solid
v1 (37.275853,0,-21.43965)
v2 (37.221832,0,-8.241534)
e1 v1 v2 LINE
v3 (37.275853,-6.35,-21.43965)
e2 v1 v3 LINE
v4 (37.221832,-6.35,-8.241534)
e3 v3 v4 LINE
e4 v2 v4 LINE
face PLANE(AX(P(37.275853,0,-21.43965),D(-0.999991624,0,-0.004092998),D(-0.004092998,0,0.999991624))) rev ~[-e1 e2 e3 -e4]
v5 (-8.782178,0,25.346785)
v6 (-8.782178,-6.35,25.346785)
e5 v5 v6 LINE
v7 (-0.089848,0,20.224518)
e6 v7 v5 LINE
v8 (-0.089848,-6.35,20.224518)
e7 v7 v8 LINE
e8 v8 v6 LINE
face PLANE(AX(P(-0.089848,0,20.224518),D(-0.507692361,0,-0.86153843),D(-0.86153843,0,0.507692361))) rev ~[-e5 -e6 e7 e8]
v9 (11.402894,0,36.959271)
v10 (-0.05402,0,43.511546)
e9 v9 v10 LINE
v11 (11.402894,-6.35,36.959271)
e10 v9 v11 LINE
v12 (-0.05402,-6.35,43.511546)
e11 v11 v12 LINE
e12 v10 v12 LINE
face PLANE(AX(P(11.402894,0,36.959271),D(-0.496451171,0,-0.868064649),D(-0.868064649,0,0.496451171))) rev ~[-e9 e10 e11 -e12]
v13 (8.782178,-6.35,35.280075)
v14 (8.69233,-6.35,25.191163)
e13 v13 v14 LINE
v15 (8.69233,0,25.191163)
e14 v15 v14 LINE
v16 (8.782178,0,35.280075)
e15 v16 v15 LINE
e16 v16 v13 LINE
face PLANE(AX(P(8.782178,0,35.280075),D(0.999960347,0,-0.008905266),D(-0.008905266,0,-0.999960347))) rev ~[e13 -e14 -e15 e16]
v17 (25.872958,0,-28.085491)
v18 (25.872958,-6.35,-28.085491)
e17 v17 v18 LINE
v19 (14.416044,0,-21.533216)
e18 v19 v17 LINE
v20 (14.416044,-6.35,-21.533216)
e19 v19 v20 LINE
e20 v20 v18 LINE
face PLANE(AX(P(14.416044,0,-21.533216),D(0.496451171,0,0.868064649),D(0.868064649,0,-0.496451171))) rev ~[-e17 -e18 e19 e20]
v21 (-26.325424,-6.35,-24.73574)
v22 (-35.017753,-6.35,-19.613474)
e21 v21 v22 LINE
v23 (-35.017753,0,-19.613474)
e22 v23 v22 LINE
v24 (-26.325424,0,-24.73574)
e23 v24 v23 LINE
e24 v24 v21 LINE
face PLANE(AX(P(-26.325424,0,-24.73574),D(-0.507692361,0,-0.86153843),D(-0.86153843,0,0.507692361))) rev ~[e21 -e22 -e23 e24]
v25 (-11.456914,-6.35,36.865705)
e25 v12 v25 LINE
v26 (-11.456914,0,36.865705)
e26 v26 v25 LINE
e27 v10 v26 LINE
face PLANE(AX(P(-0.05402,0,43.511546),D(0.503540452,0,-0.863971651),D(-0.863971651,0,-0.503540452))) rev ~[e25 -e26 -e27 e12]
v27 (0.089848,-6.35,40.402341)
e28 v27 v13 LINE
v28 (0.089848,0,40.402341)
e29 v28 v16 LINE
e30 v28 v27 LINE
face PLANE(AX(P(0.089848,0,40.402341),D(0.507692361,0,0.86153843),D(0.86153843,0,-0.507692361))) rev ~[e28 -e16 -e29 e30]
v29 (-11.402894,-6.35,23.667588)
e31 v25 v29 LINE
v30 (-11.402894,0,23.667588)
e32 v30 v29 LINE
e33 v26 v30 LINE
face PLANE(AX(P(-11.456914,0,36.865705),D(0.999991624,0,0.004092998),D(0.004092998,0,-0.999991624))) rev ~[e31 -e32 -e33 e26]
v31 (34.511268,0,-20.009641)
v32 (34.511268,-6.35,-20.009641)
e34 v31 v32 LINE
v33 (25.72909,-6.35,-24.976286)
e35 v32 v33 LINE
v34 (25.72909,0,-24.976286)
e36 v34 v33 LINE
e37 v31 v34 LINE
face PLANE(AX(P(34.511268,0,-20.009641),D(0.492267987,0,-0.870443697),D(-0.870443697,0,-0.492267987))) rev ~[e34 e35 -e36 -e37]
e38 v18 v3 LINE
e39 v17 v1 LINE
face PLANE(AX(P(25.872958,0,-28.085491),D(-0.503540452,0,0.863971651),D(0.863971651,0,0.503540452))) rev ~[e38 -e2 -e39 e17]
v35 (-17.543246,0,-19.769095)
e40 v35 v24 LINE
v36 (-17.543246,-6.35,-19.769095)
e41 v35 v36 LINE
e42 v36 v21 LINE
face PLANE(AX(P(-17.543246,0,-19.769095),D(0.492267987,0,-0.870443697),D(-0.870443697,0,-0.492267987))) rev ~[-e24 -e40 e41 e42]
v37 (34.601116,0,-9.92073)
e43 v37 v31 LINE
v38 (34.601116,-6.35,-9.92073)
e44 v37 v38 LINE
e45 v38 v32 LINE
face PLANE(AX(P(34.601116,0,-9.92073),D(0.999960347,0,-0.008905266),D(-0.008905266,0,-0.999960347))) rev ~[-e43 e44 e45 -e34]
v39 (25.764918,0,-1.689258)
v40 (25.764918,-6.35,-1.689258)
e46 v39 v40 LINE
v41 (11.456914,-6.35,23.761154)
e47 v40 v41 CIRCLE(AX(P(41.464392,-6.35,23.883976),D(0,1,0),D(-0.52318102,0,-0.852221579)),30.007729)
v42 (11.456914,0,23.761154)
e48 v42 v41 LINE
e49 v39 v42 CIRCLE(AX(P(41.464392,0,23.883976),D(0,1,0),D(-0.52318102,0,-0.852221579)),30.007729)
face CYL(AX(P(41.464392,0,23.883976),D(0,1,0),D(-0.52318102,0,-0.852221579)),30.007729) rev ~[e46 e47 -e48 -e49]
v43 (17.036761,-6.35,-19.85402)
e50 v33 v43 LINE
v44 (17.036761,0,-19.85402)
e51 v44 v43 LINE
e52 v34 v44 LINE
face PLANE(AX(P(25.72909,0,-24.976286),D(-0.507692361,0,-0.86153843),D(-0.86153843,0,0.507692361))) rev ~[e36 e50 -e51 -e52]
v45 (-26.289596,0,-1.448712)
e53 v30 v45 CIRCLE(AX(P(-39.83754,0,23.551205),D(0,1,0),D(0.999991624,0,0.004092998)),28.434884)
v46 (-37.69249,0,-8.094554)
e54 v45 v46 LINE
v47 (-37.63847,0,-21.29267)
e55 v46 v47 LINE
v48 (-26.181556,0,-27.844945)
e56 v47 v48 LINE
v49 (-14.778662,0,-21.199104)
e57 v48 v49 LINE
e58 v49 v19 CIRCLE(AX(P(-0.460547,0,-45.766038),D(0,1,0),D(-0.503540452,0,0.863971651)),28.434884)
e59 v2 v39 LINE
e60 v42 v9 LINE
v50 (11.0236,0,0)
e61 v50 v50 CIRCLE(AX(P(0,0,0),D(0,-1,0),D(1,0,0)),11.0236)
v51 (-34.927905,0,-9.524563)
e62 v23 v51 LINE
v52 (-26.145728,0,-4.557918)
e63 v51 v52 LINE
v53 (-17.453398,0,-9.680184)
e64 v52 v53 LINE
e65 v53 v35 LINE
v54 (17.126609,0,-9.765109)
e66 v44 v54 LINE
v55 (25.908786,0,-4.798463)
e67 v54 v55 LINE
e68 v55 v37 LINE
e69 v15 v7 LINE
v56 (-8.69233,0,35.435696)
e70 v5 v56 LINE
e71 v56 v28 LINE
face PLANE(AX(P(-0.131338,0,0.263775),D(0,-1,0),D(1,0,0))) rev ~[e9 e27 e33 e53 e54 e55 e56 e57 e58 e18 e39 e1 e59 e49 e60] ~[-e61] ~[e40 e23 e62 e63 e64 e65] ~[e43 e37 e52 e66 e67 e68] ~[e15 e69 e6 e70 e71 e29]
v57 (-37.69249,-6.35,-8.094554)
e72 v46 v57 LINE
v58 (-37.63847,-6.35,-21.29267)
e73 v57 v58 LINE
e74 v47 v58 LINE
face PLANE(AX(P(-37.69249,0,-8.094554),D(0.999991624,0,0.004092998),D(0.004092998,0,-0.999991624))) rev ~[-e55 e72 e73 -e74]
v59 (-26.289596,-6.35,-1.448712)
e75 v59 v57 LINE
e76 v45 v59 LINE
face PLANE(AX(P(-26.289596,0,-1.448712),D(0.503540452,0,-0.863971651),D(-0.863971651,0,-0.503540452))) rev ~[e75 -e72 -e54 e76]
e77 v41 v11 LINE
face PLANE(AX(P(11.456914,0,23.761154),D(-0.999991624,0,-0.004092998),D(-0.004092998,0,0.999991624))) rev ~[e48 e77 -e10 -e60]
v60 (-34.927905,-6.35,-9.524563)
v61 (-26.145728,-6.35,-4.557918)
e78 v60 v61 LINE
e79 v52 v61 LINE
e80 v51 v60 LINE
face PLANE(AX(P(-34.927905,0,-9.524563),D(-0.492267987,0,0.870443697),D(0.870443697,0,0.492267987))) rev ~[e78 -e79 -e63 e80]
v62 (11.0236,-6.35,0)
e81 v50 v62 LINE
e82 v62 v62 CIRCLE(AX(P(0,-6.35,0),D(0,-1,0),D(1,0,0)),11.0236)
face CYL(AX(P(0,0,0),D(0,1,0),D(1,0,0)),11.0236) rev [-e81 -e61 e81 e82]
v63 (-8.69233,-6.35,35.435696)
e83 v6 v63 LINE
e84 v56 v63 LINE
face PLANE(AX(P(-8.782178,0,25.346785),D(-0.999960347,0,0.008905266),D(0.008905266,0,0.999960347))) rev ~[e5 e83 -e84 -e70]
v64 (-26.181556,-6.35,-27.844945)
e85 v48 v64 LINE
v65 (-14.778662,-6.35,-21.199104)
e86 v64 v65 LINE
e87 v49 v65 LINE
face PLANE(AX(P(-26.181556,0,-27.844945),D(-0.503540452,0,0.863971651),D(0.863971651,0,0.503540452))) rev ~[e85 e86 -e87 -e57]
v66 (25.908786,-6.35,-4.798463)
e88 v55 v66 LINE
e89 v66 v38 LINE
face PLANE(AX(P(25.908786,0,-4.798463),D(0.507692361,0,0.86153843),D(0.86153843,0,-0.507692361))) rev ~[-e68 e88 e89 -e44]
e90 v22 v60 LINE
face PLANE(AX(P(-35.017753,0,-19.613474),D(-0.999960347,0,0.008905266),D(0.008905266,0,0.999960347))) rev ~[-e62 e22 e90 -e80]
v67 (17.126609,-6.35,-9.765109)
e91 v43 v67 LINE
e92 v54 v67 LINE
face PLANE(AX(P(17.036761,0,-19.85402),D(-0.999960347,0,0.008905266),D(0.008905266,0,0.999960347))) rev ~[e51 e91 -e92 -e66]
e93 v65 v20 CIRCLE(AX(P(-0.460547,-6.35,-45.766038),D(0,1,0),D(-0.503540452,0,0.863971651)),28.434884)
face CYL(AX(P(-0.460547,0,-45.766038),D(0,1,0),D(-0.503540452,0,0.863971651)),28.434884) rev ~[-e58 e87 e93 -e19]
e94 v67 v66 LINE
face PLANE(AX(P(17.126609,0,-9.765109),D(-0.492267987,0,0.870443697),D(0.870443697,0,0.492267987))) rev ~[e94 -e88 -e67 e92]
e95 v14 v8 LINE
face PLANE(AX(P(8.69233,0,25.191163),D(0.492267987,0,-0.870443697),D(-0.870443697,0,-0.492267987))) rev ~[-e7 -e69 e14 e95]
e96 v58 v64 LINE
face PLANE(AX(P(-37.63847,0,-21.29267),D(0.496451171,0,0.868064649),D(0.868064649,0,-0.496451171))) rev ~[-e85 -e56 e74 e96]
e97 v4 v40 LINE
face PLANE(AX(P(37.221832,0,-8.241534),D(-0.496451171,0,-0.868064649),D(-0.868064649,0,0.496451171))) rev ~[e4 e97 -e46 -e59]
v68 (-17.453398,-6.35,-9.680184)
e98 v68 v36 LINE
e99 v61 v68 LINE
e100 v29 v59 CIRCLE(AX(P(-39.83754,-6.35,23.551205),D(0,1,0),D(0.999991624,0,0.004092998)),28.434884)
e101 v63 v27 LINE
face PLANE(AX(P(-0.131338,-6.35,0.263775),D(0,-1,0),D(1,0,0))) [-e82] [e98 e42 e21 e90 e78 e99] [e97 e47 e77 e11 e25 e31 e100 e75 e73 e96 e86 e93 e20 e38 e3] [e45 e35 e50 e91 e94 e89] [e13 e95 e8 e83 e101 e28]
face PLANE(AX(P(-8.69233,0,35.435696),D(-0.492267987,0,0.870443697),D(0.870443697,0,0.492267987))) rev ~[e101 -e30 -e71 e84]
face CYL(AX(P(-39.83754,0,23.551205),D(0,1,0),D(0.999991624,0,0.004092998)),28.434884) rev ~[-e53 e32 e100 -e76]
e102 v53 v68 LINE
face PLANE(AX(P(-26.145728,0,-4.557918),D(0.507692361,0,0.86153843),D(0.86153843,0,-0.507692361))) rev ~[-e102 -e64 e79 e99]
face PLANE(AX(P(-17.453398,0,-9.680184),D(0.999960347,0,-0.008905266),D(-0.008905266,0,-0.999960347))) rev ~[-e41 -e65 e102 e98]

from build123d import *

# Parameters (mm, degrees)
F0_R     = 14.2875
F0_R_2   = 11.0236
F1_DEPTH = 6.35


# Not quite as in the source:
# - a feature names something its author has since deleted; it is built from what else it names


with BuildPart() as f1:
    # F0 (on Front) → F1 (new body)
    with BuildSketch(Plane.XZ):
        with BuildLine():
            ThreePointArc((25.7649177957, -1.6892582355), (15.3069411381, 9.1784817197), (11.4569144183, 23.7611543748))
            Line((11.4569144183, 23.7611543748), (0.05402032, 17.115313105))
            Line((0.05402032, 17.115313105), (-11.4028940983, 23.6675884359))
            ThreePointArc((-11.4028940983, 23.6675884359), (-15.3765179084, 9.0528933251), (-26.2895962669, -1.4487122715))
            Line((-26.2895962669, -1.4487122715), (-14.8326818486, -8.0009876024))
            Line((-14.8326818486, -8.0009876024), (-14.7786615286, -21.1991042031))
            ThreePointArc((-14.7786615286, -21.1991042031), (-0.135152389, -17.3330158123), (14.4160440174, -21.533216106))
            Line((14.4160440174, -21.533216106), (14.3620236974, -8.3350995053))
            Line((14.3620236974, -8.3350995053), (25.7649177957, -1.6892582355))
        make_face()
        Circle(F0_R, mode=Mode.SUBTRACT)
        Circle(F0_R)
        Circle(F0_R_2, mode=Mode.SUBTRACT)
        Polygon((11.4028940983, 36.9592709755), (-0.05402032, 43.5115463064), (-11.4569144183, 36.8657050366), (-11.4028940983, 23.6675884359), (0.05402032, 17.115313105), (11.4569144183, 23.7611543748), align=None)
        Polygon((-8.6923295278, 35.4356960394), (0.089848006, 40.4023410617), (8.7821775338, 35.280074728), (8.6923295278, 25.191163372), (-0.089848006, 20.2245183497), (-8.7821775338, 25.3467846834), align=None, mode=Mode.SUBTRACT)
        Polygon((37.221832214, -8.2415335664), (25.7649177957, -1.6892582355), (14.3620236974, -8.3350995053), (14.4160440174, -21.533216106), (25.8729584357, -28.0854914369), (37.275852534, -21.4396501671), align=None)
        Polygon((17.1266085879, -9.7651085025), (25.9087861217, -4.7984634802), (34.6011156495, -9.9207298139), (34.5112676435, -20.0096411699), (25.7290901097, -24.9762861922), (17.0367605819, -19.8540198585), align=None, mode=Mode.SUBTRACT)
        Polygon((-14.8326818486, -8.0009876024), (-26.2895962669, -1.4487122715), (-37.6924903652, -8.0945535413), (-37.6384700452, -21.292670142), (-26.1815556269, -27.8449454729), (-14.7786615286, -21.1991042031), align=None)
        Polygon((-17.4533984131, -9.6801838499), (-17.5432464191, -19.7690952059), (-26.325423953, -24.7357402282), (-35.0177534808, -19.6134738945), (-34.9279054747, -9.5245625385), (-26.1457279409, -4.5579175162), align=None, mode=Mode.SUBTRACT)
    extrude(amount=F1_DEPTH)


solid = f1.part
